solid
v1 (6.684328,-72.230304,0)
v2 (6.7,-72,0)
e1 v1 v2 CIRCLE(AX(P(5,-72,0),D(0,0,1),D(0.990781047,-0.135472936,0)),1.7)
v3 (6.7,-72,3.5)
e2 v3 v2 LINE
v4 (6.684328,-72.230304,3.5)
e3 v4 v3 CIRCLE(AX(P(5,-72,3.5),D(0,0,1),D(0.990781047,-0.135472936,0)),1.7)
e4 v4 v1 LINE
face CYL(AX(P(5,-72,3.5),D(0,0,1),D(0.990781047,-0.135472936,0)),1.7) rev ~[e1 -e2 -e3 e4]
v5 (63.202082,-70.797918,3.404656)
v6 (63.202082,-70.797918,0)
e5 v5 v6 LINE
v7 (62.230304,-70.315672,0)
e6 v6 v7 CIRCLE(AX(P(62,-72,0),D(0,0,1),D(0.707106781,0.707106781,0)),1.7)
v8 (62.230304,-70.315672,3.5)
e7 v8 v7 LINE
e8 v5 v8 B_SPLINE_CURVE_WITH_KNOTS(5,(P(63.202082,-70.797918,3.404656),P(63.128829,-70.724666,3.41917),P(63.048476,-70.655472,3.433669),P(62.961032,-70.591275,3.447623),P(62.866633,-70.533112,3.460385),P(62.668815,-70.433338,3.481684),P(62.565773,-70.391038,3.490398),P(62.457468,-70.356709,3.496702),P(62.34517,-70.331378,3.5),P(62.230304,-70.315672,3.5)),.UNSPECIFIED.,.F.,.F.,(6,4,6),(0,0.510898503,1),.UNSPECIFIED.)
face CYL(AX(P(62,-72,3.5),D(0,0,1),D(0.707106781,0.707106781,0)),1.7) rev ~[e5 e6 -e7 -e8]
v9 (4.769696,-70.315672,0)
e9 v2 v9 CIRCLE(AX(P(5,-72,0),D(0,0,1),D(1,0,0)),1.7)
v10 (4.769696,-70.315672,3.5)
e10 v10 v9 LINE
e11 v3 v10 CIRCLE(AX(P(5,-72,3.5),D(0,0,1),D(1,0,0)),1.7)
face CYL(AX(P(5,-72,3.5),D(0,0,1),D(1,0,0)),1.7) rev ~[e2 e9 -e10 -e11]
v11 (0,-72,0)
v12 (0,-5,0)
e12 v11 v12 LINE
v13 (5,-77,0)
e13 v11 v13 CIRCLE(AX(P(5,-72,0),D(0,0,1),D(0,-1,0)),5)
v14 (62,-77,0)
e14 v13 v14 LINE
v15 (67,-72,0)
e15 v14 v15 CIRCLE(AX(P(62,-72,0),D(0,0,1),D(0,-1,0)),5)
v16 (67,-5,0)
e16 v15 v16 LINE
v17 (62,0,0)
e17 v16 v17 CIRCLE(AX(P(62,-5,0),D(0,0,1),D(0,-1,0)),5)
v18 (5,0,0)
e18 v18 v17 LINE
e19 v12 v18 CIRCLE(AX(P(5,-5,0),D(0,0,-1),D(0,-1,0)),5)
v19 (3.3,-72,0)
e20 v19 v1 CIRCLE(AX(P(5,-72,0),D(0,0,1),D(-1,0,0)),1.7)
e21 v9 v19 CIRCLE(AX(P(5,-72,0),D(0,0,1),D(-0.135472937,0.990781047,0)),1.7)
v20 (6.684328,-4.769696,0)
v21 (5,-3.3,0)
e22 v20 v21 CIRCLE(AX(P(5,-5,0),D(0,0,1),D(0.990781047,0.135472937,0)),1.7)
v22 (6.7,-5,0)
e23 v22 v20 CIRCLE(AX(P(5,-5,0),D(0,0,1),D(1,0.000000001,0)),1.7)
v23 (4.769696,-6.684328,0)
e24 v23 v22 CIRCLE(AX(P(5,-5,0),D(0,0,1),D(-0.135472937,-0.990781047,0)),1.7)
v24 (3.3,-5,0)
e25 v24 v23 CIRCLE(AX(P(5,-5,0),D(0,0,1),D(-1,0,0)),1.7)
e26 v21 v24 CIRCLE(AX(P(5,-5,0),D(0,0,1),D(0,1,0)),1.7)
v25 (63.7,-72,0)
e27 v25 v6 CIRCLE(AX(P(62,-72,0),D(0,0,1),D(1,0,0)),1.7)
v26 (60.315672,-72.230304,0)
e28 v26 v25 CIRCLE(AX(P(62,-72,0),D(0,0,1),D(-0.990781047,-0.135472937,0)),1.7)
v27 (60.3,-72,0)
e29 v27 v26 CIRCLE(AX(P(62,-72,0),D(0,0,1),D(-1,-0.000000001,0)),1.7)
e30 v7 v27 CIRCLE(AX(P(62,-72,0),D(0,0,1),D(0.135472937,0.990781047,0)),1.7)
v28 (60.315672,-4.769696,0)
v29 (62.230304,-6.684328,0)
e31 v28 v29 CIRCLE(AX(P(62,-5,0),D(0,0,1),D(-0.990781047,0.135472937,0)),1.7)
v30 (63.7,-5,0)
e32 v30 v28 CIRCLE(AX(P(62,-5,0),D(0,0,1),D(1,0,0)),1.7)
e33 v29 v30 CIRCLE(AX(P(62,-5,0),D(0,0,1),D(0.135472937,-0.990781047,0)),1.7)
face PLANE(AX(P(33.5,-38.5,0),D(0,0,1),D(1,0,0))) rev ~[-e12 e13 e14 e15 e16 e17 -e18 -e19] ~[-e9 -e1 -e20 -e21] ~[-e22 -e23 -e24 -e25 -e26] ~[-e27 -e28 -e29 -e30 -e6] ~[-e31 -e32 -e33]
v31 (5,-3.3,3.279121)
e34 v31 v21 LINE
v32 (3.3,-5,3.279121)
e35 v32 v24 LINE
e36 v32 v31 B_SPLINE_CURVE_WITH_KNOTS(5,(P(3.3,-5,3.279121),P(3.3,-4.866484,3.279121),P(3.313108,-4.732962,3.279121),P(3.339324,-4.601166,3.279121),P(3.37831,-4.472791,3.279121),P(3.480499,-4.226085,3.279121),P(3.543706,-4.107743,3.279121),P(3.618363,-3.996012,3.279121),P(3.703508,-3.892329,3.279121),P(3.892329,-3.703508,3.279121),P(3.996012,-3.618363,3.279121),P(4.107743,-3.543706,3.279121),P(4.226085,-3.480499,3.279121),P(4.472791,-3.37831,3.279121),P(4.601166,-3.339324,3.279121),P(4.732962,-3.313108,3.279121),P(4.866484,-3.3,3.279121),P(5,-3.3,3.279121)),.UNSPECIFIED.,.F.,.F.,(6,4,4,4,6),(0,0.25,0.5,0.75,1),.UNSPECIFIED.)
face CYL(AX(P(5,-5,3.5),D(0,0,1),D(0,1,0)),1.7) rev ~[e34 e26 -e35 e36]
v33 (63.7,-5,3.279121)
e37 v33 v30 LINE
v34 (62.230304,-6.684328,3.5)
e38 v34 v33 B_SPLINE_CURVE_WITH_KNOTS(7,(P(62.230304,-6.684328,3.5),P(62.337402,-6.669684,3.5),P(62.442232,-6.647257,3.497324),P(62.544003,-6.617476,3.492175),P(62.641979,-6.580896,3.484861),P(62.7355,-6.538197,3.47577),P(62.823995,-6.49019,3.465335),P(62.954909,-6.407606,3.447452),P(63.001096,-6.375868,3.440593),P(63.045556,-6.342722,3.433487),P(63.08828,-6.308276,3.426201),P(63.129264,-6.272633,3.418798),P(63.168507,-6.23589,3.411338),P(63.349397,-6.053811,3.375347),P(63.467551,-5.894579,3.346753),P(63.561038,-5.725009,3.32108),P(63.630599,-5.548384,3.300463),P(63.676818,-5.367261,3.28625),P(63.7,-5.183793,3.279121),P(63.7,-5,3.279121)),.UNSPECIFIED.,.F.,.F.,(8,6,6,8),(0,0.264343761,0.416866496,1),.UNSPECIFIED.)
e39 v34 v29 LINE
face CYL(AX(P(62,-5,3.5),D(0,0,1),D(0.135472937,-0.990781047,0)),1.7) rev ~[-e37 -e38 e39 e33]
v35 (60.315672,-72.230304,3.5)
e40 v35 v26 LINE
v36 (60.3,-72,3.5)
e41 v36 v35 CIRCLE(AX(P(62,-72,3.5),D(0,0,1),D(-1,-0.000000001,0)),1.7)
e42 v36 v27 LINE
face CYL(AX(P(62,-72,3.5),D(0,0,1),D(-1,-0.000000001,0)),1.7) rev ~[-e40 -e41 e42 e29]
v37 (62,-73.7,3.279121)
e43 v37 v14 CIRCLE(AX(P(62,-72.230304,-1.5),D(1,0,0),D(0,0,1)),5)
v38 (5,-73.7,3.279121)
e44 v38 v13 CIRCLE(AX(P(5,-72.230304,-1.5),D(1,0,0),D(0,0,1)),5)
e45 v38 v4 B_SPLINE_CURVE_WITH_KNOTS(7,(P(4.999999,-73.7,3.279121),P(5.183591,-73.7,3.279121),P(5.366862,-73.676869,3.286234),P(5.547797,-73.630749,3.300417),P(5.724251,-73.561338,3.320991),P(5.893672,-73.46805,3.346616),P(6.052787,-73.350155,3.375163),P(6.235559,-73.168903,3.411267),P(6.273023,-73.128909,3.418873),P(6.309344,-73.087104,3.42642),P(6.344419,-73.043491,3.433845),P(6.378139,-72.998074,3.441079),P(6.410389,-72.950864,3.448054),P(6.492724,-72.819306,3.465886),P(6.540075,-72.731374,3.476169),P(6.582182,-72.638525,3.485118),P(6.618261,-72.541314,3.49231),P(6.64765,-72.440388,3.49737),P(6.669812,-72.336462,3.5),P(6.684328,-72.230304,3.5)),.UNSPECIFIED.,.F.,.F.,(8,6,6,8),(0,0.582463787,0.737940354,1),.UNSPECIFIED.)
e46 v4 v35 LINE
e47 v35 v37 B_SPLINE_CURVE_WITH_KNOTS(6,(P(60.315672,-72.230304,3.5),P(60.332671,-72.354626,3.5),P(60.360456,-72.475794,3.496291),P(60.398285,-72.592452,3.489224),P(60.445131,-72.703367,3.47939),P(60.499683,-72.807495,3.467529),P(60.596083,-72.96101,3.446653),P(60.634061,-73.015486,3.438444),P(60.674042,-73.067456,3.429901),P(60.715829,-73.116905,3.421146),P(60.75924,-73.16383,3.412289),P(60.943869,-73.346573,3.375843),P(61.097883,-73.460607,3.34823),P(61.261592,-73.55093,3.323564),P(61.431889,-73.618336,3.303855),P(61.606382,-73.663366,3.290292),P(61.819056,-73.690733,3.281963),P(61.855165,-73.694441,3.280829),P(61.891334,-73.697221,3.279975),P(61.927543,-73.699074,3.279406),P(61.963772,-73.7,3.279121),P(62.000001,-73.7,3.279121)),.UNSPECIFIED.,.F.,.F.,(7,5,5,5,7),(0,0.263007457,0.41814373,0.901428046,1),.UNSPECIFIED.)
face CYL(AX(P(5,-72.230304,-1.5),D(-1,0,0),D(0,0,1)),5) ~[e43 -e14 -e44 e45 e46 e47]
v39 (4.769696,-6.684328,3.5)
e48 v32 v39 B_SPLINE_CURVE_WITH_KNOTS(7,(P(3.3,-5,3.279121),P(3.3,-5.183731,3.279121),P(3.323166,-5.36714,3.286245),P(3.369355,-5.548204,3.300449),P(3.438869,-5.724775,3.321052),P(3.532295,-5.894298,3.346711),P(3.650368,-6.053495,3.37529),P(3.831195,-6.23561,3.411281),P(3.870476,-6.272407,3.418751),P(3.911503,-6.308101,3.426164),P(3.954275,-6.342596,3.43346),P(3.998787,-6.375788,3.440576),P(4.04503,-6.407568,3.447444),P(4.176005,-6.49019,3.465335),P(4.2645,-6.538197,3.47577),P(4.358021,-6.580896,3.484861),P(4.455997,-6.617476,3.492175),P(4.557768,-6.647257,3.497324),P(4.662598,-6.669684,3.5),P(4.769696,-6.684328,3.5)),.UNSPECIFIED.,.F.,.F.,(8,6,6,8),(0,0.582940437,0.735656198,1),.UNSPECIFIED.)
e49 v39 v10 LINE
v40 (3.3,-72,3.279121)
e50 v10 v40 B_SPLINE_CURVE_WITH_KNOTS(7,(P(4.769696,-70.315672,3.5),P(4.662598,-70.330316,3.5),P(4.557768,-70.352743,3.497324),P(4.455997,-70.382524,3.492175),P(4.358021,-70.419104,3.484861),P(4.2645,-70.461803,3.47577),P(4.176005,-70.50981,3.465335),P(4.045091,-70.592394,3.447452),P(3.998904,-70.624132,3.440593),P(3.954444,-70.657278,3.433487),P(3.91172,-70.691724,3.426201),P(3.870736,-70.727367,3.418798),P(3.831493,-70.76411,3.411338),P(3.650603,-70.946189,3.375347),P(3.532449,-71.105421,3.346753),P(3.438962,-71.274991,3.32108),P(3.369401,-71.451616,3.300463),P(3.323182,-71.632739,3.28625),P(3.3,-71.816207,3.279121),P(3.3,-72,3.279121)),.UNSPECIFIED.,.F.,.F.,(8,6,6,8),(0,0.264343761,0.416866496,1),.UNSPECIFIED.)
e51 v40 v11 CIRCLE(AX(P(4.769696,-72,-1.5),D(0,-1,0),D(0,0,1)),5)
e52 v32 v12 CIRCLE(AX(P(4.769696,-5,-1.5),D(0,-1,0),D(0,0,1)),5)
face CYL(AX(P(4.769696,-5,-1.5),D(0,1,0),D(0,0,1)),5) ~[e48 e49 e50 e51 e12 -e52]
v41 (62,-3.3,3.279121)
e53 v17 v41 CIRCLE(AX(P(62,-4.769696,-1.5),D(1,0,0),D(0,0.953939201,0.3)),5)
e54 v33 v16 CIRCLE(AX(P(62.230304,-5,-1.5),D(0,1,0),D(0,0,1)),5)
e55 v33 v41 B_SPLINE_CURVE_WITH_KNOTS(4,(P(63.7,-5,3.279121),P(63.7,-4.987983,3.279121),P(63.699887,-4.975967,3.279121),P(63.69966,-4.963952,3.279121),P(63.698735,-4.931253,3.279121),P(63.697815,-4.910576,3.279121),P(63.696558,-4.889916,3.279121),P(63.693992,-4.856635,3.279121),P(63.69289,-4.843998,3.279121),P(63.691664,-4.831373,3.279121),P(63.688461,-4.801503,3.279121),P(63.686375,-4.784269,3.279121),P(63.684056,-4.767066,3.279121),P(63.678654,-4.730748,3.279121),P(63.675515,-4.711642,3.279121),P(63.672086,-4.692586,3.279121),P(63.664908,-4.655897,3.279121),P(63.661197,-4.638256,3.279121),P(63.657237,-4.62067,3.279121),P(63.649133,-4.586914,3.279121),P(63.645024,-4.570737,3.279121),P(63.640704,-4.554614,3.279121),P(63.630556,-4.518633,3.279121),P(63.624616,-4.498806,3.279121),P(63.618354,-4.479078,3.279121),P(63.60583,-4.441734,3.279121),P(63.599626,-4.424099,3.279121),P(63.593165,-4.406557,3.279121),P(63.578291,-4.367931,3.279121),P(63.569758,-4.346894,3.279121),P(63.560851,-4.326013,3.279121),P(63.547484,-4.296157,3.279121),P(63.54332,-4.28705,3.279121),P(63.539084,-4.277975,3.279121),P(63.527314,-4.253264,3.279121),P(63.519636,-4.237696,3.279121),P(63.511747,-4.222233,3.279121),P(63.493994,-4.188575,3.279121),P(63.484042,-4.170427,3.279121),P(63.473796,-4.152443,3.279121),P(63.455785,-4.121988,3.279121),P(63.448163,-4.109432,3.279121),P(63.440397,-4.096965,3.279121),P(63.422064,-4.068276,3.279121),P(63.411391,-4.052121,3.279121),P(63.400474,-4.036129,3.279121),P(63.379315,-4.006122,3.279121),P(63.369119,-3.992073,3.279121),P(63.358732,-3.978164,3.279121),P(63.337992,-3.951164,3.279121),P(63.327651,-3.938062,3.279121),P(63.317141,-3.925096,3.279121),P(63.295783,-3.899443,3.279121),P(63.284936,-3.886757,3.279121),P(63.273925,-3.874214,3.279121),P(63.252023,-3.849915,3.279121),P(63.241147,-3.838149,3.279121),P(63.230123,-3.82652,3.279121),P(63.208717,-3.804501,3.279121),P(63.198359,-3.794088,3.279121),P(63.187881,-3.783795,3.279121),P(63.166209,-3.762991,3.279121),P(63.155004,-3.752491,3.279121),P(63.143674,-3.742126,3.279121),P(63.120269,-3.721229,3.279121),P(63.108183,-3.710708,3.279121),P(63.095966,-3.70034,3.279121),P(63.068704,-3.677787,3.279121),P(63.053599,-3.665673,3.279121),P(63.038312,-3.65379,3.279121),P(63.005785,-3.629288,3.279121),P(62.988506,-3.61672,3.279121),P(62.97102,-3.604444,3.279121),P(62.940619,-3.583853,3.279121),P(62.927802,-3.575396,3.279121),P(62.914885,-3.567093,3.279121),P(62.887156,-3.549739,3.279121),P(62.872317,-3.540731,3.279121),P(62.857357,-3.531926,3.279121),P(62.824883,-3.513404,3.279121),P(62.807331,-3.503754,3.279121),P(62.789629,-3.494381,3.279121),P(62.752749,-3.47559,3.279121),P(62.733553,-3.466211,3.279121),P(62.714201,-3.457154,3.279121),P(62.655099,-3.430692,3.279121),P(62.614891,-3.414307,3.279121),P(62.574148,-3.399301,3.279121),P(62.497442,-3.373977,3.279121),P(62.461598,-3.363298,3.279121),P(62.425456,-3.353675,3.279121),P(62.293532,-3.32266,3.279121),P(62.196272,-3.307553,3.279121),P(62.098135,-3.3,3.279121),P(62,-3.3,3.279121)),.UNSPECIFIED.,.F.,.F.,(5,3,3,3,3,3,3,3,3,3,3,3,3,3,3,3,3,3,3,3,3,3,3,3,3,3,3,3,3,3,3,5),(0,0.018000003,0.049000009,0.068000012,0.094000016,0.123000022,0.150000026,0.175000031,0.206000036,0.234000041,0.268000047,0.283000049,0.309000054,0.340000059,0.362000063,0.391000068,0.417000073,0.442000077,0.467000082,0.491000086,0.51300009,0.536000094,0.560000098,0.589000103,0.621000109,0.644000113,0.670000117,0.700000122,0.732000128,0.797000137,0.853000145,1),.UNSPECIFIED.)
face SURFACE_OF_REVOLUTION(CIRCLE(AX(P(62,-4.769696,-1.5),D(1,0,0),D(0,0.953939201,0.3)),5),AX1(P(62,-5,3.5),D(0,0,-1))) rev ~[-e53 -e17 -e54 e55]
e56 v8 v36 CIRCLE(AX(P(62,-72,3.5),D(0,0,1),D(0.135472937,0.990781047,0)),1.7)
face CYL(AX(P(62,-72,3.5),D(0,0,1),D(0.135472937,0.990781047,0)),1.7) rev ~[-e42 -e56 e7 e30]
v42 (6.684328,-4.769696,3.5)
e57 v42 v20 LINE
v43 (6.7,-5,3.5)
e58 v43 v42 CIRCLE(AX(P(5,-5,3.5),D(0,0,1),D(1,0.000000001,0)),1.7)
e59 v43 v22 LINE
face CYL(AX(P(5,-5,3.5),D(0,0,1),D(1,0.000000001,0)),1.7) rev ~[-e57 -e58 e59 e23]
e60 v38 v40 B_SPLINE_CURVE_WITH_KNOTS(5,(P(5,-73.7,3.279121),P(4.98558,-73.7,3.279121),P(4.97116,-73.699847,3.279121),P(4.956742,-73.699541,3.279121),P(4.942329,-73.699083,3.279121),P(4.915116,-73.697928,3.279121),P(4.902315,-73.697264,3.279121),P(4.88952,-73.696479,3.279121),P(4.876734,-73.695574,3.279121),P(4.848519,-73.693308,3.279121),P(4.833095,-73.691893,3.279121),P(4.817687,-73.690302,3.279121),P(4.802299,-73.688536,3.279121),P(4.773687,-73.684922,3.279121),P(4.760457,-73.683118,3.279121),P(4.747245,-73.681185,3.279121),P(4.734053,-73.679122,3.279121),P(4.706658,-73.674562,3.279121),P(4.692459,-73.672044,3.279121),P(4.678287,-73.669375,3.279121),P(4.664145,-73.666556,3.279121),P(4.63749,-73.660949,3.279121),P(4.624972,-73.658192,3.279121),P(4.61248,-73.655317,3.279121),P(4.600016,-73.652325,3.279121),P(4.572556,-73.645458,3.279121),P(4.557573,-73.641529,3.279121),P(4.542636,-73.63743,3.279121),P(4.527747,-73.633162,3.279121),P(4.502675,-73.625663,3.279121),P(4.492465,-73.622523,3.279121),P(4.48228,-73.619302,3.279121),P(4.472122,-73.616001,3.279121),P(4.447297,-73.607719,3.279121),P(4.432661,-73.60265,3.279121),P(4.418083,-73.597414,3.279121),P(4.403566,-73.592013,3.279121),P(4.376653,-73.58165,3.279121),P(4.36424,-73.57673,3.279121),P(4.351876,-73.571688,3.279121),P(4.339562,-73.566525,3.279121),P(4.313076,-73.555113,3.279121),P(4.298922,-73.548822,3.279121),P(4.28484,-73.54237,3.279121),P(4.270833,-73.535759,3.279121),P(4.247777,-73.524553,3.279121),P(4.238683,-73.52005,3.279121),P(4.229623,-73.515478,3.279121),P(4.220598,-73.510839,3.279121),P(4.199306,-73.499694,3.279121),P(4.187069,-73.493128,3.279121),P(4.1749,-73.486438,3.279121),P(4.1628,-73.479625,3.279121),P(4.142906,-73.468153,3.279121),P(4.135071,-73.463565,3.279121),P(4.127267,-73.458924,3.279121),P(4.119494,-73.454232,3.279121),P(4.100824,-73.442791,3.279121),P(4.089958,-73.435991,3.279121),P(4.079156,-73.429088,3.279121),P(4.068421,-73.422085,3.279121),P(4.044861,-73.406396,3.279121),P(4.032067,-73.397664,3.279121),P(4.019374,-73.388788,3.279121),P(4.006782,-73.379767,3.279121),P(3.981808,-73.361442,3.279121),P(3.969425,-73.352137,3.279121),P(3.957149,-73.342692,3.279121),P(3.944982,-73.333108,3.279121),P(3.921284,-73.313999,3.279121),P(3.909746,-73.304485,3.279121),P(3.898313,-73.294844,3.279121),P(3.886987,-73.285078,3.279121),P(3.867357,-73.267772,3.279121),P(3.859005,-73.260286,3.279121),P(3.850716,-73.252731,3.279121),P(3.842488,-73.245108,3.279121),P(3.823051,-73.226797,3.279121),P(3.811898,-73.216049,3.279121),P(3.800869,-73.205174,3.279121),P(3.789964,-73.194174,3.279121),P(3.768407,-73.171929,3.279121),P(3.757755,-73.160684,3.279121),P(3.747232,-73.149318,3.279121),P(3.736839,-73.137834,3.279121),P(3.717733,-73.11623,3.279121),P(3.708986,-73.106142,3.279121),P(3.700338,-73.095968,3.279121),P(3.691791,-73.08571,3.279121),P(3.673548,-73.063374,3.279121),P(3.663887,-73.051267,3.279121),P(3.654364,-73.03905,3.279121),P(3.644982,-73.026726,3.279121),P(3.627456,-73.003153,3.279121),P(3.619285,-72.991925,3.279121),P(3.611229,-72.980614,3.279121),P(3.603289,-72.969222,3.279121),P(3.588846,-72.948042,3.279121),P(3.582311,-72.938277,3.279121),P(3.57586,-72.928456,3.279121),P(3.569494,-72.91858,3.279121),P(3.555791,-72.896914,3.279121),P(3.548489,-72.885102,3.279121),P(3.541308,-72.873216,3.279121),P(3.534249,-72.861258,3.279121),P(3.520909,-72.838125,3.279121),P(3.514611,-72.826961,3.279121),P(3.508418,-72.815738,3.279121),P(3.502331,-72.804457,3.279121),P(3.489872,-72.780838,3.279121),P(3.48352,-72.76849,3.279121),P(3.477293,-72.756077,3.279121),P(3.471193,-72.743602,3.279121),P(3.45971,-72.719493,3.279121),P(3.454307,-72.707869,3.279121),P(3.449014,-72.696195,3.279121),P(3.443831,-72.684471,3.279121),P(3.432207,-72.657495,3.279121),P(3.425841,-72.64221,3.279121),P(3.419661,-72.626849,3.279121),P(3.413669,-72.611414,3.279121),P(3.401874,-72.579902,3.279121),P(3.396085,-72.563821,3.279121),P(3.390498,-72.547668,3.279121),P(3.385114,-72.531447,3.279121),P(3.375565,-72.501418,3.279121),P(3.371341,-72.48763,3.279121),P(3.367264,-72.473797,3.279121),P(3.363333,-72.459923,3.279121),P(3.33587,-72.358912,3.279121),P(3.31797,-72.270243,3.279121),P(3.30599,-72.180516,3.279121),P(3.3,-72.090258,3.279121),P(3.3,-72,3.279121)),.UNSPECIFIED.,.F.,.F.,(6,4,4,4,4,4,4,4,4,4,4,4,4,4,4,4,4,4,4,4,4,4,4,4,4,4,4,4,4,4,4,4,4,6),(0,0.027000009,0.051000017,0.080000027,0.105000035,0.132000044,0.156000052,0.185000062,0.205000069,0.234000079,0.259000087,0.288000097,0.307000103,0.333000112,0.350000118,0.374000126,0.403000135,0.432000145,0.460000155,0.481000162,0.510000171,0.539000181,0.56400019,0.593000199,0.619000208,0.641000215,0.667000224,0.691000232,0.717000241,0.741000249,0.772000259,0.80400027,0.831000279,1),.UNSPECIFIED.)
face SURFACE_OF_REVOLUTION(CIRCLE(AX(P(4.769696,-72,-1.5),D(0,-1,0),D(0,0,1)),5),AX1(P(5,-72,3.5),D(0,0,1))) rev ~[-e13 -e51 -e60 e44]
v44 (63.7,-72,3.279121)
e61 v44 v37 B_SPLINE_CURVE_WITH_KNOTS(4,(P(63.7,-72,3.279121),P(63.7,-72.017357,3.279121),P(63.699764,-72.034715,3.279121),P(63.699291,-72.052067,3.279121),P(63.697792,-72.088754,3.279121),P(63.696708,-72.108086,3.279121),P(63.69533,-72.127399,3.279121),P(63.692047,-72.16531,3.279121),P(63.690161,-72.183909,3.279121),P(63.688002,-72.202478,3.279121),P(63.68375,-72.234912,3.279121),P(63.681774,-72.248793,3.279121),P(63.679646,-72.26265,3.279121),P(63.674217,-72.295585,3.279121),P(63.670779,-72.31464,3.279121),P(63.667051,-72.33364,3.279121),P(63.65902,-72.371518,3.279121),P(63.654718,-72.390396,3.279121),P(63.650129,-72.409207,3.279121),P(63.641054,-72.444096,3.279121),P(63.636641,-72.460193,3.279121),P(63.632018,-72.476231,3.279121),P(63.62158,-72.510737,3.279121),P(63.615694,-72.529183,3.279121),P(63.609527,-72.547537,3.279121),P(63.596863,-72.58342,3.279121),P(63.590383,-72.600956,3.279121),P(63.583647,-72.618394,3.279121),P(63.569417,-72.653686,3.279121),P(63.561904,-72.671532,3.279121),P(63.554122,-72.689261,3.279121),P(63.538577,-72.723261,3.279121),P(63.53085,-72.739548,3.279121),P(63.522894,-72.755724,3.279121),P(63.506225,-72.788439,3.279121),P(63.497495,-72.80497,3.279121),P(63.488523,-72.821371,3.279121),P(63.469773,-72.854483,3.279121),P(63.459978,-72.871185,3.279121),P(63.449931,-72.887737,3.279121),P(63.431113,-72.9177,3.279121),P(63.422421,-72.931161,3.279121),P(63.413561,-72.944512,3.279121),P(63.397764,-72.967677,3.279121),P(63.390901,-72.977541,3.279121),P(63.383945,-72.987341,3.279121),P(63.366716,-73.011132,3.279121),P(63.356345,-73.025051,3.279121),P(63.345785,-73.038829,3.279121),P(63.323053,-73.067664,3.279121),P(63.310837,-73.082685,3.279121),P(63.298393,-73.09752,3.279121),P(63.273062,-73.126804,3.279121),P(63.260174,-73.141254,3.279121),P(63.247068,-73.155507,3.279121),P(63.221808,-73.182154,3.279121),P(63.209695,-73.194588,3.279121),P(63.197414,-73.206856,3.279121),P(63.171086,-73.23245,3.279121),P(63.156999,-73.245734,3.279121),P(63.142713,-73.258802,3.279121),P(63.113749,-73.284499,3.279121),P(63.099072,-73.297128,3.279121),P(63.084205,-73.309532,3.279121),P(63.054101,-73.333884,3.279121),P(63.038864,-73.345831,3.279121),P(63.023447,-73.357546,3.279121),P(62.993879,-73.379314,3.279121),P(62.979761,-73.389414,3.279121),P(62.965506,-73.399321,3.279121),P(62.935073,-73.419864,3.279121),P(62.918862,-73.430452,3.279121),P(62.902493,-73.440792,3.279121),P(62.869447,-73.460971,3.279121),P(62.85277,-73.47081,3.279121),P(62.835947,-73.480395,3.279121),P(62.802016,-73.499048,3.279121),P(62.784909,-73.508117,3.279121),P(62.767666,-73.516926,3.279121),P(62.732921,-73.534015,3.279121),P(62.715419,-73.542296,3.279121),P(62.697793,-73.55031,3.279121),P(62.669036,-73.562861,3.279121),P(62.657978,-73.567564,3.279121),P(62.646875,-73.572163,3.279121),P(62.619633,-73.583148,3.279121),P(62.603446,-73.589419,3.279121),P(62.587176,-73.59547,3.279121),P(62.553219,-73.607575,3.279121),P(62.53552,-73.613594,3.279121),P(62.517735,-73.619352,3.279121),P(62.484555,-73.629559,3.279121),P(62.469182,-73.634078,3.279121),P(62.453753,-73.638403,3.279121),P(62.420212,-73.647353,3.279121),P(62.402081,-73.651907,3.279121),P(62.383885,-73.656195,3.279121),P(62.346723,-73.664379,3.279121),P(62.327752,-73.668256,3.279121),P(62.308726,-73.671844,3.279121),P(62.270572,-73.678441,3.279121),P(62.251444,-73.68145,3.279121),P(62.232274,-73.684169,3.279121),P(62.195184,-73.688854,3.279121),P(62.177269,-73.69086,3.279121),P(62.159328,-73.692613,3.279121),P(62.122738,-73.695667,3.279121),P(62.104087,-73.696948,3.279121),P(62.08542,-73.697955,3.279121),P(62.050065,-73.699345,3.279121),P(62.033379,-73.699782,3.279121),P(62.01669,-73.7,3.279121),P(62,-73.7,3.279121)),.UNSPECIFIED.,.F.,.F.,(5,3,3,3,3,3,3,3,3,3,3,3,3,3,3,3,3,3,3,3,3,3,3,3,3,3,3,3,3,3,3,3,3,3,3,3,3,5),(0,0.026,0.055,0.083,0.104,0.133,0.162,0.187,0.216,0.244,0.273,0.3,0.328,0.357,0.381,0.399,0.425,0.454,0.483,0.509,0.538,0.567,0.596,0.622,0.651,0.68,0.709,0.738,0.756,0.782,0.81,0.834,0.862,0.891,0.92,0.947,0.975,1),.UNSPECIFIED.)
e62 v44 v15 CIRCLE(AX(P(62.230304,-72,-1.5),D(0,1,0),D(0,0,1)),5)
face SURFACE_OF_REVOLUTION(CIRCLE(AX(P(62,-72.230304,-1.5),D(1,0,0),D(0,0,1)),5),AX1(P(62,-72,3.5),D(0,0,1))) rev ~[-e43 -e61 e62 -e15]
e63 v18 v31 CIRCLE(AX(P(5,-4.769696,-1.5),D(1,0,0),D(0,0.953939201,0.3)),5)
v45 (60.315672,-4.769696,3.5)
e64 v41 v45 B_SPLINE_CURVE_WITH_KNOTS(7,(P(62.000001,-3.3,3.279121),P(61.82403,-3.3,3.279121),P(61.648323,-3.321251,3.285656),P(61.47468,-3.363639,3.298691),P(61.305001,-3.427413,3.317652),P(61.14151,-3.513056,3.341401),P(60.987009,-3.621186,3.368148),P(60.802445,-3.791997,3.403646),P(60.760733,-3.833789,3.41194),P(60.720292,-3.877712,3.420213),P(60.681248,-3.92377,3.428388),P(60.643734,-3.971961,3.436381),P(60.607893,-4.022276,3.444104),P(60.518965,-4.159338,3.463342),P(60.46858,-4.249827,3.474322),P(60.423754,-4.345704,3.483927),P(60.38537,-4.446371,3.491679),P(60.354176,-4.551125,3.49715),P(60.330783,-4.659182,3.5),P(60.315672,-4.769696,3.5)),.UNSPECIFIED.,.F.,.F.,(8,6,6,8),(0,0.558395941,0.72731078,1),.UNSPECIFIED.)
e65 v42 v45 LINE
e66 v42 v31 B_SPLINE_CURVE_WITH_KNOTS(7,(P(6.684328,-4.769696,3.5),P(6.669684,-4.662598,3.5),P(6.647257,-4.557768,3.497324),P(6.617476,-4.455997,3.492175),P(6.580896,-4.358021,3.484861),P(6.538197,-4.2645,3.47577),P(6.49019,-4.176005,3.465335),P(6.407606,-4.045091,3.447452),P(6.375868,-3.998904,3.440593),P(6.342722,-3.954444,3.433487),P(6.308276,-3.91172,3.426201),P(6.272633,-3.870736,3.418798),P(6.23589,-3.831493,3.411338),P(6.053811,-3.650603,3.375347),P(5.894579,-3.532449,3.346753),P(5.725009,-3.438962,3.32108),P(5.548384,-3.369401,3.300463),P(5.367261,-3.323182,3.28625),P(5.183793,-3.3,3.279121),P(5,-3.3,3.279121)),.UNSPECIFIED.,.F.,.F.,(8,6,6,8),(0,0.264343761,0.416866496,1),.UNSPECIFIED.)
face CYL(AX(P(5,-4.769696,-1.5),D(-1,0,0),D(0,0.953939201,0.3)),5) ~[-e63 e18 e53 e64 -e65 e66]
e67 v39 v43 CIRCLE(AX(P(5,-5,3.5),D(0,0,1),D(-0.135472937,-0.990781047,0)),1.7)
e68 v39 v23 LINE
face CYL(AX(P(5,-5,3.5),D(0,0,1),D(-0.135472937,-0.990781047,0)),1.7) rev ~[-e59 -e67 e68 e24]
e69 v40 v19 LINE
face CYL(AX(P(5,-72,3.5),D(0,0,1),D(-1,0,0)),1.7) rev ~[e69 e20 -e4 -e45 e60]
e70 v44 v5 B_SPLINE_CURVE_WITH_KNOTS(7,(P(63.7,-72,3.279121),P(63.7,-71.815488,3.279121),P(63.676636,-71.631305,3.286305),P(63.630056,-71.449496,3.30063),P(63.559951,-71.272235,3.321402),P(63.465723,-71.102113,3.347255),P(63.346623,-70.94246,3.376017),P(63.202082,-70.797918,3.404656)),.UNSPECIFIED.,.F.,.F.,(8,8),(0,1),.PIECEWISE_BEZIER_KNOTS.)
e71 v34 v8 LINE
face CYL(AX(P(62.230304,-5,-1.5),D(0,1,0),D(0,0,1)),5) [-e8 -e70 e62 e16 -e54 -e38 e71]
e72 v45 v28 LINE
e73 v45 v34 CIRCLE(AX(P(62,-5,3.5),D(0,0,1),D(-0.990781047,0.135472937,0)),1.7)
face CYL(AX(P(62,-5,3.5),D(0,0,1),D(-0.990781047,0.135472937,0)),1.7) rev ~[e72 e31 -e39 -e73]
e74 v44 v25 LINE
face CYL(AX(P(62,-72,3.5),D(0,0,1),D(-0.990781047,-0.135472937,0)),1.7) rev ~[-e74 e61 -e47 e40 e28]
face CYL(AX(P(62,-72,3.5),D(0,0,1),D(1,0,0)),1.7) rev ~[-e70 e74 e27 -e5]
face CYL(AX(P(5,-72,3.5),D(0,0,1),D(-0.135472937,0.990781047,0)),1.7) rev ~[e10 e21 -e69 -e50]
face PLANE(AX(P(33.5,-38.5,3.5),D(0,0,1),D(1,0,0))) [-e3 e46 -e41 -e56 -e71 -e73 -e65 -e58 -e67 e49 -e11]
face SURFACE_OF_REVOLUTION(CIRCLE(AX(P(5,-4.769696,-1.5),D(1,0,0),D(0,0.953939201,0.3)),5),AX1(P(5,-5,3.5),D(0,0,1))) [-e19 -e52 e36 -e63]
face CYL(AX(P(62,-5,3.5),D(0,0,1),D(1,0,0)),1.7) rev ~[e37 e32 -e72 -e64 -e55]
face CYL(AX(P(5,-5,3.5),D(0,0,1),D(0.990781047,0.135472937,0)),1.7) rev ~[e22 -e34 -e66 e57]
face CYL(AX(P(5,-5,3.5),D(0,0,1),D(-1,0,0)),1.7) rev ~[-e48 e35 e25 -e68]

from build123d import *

# Parameters (mm, degrees)
F0_W         = 67
F0_H         = 77
F1_DEPTH     = 3.5
F2_R         = 5
F3_T1_DEPTH  = 57
F3_T3_DEPTH  = 67
F3_T6_ANGLE  = 90
F3_T8_ANGLE  = 90
F3_T10_ANGLE = 90
F3_T12_ANGLE = 90
F5_DEPTH     = 3.5


# Not quite as in the source:
# - a fillet or chamfer that OpenCascade refuses, or shapes differently, is made with other operations: its cross-section is extruded or revolved along the edge and cut away or added


with BuildPart() as f1:
    # F0 (on Top) → F1 (new body)
    with BuildSketch(Plane.XY):
        with Locations((33.5, -38.5)):
            Rectangle(F0_W, F0_H)
    extrude(amount=F1_DEPTH)

    # F2
    f2_edges = [f1.edges().sort_by_distance(p)[0] for p in [
        (67, -77, 1.75),
        (67, 0, 1.75),
        (0, 0, 1.75),
        (0, -77, 1.75),
    ]]
    fillet(f2_edges, radius=F2_R)

    # F3: fillet of radius 5 on 8 edges, made by hand

    # F3_s2 → F3_t1 (cut)
    with BuildSketch(Plane.YZ.offset(5)):
        with BuildLine():
            ThreePointArc((0, 0), (-1.8116561155, 2.5311288741), (-4.7696960071, 3.5))
            Line((-4.7696960071, 3.5), (0, 3.5))
            Line((0, 3.5), (0, 0))
        make_face()
        with BuildLine():
            ThreePointArc((-72.2303039929, 3.5), (-75.1883438845, 2.5311288741), (-77, 0))
            Line((-77, 0), (-77, 3.5))
            Line((-77, 3.5), (-72.2303039929, 3.5))
        make_face()
    extrude(amount=F3_T1_DEPTH, mode=Mode.SUBTRACT)

    # F3_s4 → F3_t3 (cut)
    with BuildSketch(Plane.XZ.offset(5)):
        with BuildLine():
            ThreePointArc((62.2303039929, 3.5), (65.1883438845, 2.5311288741), (67, 0))
            Line((67, 0), (67, 3.5))
            Line((67, 3.5), (62.2303039929, 3.5))
        make_face()
        with BuildLine():
            ThreePointArc((4.7696960071, 3.5), (1.8116561155, 2.5311288741), (0, 0))
            Line((0, 0), (0, 3.5))
            Line((0, 3.5), (4.7696960071, 3.5))
        make_face()
    extrude(amount=F3_T3_DEPTH, mode=Mode.SUBTRACT)

    # F3_s5 → F3_t6 (revolve, cut)
    with BuildSketch(Plane.YZ.offset(62)):
        with BuildLine():
            ThreePointArc((0, 0), (-1.8116561155, 2.5311288741), (-4.7696960071, 3.5))
            Line((-4.7696960071, 3.5), (0, 3.5))
            Line((0, 3.5), (0, 0))
        make_face()
    revolve(axis=Axis((62, -5, 3.5), (0, 0, -1)), revolution_arc=F3_T6_ANGLE, mode=Mode.SUBTRACT)

    # F3_s7 → F3_t8 (revolve, cut)
    with BuildSketch(Plane.YZ.offset(5)):
        with BuildLine():
            ThreePointArc((0, 0), (-1.8116561155, 2.5311288741), (-4.7696960071, 3.5))
            Line((-4.7696960071, 3.5), (0, 3.5))
            Line((0, 3.5), (0, 0))
        make_face()
    revolve(axis=Axis((5, -5, 3.5), (0, 0, 1)), revolution_arc=F3_T8_ANGLE, mode=Mode.SUBTRACT)

    # F3_s9 → F3_t10 (revolve, cut)
    with BuildSketch(Plane.YZ.offset(62)):
        with BuildLine():
            ThreePointArc((-72.2303039929, 3.5), (-75.1883438845, 2.5311288741), (-77, 0))
            Line((-77, 0), (-77, 3.5))
            Line((-77, 3.5), (-72.2303039929, 3.5))
        make_face()
    revolve(axis=Axis((62, -72, 3.5), (0, 0, 1)), revolution_arc=F3_T10_ANGLE, mode=Mode.SUBTRACT)

    # F3_s11 → F3_t12 (revolve, cut)
    with BuildSketch(Plane.XZ.offset(72)):
        with BuildLine():
            ThreePointArc((4.7696960071, 3.5), (1.8116561155, 2.5311288741), (0, 0))
            Line((0, 0), (0, 3.5))
            Line((0, 3.5), (4.7696960071, 3.5))
        make_face()
    revolve(axis=Axis((5, -72, 3.5), (0, 0, 1)), revolution_arc=F3_T12_ANGLE, mode=Mode.SUBTRACT)

    # F4 (on face) → F5 (cut)
    with BuildSketch(Plane.XY.offset(3.5)):
        with BuildLine():
            Line((62.2303039929, -72), (63.7, -72))
            ThreePointArc((63.7, -72), (63.5705952053, -71.349438165), (63.202081528, -70.797918472))
            Line((63.202081528, -70.797918472), (62.2303039929, -71.7696960071))
            Line((62.2303039929, -71.7696960071), (62.2303039929, -72))
        make_face()
        with BuildLine():
            ThreePointArc((63.202081528, -70.797918472), (62.7556933452, -70.4771974626), (62.2303039929, -70.3156722199))
            Line((62.2303039929, -70.3156722199), (62.2303039929, -71.7696960071))
            Line((62.2303039929, -71.7696960071), (63.202081528, -70.797918472))
        make_face()
        with BuildLine():
            ThreePointArc((62.2303039929, -70.3156722199), (60.8823052268, -70.7190790836), (60.3, -72))
            Line((60.3, -72), (62, -72))
            Line((62, -72), (62.2303039929, -71.7696960071))
            Line((62.2303039929, -71.7696960071), (62.2303039929, -70.3156722199))
        make_face()
        with BuildLine():
            Line((62, -72.2303039929), (60.3156722199, -72.2303039929))
            ThreePointArc((60.3156722199, -72.2303039929), (62.1154183127, -73.6960774195), (63.7, -72))
            Line((63.7, -72), (62.2303039929, -72))
            ThreePointArc((62.2303039929, -72), (62.1628495151, -72.1628495151), (62, -72.2303039929))
        make_face()
        with BuildLine():
            ThreePointArc((60.3, -72), (60.3039225805, -72.1154183127), (60.3156722199, -72.2303039929))
            Line((60.3156722199, -72.2303039929), (62, -72.2303039929))
            ThreePointArc((62, -72.2303039929), (62.1628495151, -72.1628495151), (62.2303039929, -72))
            Line((62.2303039929, -72), (62, -72))
            Line((62, -72), (60.3, -72))
        make_face()
        Polygon((62.2303039929, -71.7696960071), (62, -72), (62.2303039929, -72), align=None)
        with BuildLine():
            Line((4.7696960071, -72), (3.3, -72))
            ThreePointArc((3.3, -72), (4.8845816873, -73.6960774195), (6.6843277801, -72.2303039929))
            Line((6.6843277801, -72.2303039929), (5, -72.2303039929))
            ThreePointArc((5, -72.2303039929), (4.8371504849, -72.1628495151), (4.7696960071, -72))
        make_face()
        with BuildLine():
            ThreePointArc((4.7696960071, -70.3156722199), (3.7190790836, -70.8823052268), (3.3, -72))
            Line((3.3, -72), (4.7696960071, -72))
            Line((4.7696960071, -72), (4.7696960071, -70.3156722199))
        make_face()
        with BuildLine():
            Line((4.7696960071, -70.3156722199), (4.7696960071, -72))
            Line((4.7696960071, -72), (6.7, -72))
            ThreePointArc((6.7, -72), (6.1176947732, -70.7190790836), (4.7696960071, -70.3156722199))
        make_face()
        with BuildLine():
            Line((6.7, -72), (4.7696960071, -72))
            ThreePointArc((4.7696960071, -72), (4.8371504849, -72.1628495151), (5, -72.2303039929))
            Line((5, -72.2303039929), (6.6843277801, -72.2303039929))
            ThreePointArc((6.6843277801, -72.2303039929), (6.6960774195, -72.1154183127), (6.7, -72))
        make_face()
        with BuildLine():
            Line((5, -4.7696960071), (5, -3.3))
            ThreePointArc((5, -3.3), (3.797918472, -3.797918472), (3.3, -5))
            Line((3.3, -5), (4.7696960071, -5))
            ThreePointArc((4.7696960071, -5), (4.8371504849, -4.8371504849), (5, -4.7696960071))
        make_face()
        with BuildLine():
            ThreePointArc((6.6843277801, -4.7696960071), (6.1176947732, -3.7190790836), (5, -3.3))
            Line((5, -3.3), (5, -4.7696960071))
            Line((5, -4.7696960071), (6.6843277801, -4.7696960071))
        make_face()
        with BuildLine():
            Line((6.6843277801, -4.7696960071), (5, -4.7696960071))
            Line((5, -4.7696960071), (5, -5))
            Line((5, -5), (4.7696960071, -5))
            Line((4.7696960071, -5), (4.7696960071, -6.6843277801))
            ThreePointArc((4.7696960071, -6.6843277801), (6.1176947732, -6.2809209164), (6.7, -5))
            ThreePointArc((6.7, -5), (6.6960774195, -4.8845816873), (6.6843277801, -4.7696960071))
        make_face()
        with BuildLine():
            Line((4.7696960071, -5), (3.3, -5))
            ThreePointArc((3.3, -5), (3.7190790836, -6.1176947732), (4.7696960071, -6.6843277801))
            Line((4.7696960071, -6.6843277801), (4.7696960071, -5))
        make_face()
        with BuildLine():
            Line((5, -5), (5, -4.7696960071))
            ThreePointArc((5, -4.7696960071), (4.8371504849, -4.8371504849), (4.7696960071, -5))
            Line((4.7696960071, -5), (5, -5))
        make_face()
        with BuildLine():
            Line((62, -4.7696960071), (60.3156722199, -4.7696960071))
            ThreePointArc((60.3156722199, -4.7696960071), (60.797918472, -6.202081528), (62.2303039929, -6.6843277801))
            Line((62.2303039929, -6.6843277801), (62.2303039929, -5))
            ThreePointArc((62.2303039929, -5), (62.1628495151, -4.8371504849), (62, -4.7696960071))
        make_face()
        with BuildLine():
            ThreePointArc((63.7, -5), (62.1154183127, -3.3039225805), (60.3156722199, -4.7696960071))
            Line((60.3156722199, -4.7696960071), (62, -4.7696960071))
            ThreePointArc((62, -4.7696960071), (62.1628495151, -4.8371504849), (62.2303039929, -5))
            Line((62.2303039929, -5), (62.2303039929, -6.6843277801))
            ThreePointArc((62.2303039929, -6.6843277801), (63.2809209164, -6.1176947732), (63.7, -5))
        make_face()
    extrude(amount=-F5_DEPTH, mode=Mode.SUBTRACT)


solid = f1.part
